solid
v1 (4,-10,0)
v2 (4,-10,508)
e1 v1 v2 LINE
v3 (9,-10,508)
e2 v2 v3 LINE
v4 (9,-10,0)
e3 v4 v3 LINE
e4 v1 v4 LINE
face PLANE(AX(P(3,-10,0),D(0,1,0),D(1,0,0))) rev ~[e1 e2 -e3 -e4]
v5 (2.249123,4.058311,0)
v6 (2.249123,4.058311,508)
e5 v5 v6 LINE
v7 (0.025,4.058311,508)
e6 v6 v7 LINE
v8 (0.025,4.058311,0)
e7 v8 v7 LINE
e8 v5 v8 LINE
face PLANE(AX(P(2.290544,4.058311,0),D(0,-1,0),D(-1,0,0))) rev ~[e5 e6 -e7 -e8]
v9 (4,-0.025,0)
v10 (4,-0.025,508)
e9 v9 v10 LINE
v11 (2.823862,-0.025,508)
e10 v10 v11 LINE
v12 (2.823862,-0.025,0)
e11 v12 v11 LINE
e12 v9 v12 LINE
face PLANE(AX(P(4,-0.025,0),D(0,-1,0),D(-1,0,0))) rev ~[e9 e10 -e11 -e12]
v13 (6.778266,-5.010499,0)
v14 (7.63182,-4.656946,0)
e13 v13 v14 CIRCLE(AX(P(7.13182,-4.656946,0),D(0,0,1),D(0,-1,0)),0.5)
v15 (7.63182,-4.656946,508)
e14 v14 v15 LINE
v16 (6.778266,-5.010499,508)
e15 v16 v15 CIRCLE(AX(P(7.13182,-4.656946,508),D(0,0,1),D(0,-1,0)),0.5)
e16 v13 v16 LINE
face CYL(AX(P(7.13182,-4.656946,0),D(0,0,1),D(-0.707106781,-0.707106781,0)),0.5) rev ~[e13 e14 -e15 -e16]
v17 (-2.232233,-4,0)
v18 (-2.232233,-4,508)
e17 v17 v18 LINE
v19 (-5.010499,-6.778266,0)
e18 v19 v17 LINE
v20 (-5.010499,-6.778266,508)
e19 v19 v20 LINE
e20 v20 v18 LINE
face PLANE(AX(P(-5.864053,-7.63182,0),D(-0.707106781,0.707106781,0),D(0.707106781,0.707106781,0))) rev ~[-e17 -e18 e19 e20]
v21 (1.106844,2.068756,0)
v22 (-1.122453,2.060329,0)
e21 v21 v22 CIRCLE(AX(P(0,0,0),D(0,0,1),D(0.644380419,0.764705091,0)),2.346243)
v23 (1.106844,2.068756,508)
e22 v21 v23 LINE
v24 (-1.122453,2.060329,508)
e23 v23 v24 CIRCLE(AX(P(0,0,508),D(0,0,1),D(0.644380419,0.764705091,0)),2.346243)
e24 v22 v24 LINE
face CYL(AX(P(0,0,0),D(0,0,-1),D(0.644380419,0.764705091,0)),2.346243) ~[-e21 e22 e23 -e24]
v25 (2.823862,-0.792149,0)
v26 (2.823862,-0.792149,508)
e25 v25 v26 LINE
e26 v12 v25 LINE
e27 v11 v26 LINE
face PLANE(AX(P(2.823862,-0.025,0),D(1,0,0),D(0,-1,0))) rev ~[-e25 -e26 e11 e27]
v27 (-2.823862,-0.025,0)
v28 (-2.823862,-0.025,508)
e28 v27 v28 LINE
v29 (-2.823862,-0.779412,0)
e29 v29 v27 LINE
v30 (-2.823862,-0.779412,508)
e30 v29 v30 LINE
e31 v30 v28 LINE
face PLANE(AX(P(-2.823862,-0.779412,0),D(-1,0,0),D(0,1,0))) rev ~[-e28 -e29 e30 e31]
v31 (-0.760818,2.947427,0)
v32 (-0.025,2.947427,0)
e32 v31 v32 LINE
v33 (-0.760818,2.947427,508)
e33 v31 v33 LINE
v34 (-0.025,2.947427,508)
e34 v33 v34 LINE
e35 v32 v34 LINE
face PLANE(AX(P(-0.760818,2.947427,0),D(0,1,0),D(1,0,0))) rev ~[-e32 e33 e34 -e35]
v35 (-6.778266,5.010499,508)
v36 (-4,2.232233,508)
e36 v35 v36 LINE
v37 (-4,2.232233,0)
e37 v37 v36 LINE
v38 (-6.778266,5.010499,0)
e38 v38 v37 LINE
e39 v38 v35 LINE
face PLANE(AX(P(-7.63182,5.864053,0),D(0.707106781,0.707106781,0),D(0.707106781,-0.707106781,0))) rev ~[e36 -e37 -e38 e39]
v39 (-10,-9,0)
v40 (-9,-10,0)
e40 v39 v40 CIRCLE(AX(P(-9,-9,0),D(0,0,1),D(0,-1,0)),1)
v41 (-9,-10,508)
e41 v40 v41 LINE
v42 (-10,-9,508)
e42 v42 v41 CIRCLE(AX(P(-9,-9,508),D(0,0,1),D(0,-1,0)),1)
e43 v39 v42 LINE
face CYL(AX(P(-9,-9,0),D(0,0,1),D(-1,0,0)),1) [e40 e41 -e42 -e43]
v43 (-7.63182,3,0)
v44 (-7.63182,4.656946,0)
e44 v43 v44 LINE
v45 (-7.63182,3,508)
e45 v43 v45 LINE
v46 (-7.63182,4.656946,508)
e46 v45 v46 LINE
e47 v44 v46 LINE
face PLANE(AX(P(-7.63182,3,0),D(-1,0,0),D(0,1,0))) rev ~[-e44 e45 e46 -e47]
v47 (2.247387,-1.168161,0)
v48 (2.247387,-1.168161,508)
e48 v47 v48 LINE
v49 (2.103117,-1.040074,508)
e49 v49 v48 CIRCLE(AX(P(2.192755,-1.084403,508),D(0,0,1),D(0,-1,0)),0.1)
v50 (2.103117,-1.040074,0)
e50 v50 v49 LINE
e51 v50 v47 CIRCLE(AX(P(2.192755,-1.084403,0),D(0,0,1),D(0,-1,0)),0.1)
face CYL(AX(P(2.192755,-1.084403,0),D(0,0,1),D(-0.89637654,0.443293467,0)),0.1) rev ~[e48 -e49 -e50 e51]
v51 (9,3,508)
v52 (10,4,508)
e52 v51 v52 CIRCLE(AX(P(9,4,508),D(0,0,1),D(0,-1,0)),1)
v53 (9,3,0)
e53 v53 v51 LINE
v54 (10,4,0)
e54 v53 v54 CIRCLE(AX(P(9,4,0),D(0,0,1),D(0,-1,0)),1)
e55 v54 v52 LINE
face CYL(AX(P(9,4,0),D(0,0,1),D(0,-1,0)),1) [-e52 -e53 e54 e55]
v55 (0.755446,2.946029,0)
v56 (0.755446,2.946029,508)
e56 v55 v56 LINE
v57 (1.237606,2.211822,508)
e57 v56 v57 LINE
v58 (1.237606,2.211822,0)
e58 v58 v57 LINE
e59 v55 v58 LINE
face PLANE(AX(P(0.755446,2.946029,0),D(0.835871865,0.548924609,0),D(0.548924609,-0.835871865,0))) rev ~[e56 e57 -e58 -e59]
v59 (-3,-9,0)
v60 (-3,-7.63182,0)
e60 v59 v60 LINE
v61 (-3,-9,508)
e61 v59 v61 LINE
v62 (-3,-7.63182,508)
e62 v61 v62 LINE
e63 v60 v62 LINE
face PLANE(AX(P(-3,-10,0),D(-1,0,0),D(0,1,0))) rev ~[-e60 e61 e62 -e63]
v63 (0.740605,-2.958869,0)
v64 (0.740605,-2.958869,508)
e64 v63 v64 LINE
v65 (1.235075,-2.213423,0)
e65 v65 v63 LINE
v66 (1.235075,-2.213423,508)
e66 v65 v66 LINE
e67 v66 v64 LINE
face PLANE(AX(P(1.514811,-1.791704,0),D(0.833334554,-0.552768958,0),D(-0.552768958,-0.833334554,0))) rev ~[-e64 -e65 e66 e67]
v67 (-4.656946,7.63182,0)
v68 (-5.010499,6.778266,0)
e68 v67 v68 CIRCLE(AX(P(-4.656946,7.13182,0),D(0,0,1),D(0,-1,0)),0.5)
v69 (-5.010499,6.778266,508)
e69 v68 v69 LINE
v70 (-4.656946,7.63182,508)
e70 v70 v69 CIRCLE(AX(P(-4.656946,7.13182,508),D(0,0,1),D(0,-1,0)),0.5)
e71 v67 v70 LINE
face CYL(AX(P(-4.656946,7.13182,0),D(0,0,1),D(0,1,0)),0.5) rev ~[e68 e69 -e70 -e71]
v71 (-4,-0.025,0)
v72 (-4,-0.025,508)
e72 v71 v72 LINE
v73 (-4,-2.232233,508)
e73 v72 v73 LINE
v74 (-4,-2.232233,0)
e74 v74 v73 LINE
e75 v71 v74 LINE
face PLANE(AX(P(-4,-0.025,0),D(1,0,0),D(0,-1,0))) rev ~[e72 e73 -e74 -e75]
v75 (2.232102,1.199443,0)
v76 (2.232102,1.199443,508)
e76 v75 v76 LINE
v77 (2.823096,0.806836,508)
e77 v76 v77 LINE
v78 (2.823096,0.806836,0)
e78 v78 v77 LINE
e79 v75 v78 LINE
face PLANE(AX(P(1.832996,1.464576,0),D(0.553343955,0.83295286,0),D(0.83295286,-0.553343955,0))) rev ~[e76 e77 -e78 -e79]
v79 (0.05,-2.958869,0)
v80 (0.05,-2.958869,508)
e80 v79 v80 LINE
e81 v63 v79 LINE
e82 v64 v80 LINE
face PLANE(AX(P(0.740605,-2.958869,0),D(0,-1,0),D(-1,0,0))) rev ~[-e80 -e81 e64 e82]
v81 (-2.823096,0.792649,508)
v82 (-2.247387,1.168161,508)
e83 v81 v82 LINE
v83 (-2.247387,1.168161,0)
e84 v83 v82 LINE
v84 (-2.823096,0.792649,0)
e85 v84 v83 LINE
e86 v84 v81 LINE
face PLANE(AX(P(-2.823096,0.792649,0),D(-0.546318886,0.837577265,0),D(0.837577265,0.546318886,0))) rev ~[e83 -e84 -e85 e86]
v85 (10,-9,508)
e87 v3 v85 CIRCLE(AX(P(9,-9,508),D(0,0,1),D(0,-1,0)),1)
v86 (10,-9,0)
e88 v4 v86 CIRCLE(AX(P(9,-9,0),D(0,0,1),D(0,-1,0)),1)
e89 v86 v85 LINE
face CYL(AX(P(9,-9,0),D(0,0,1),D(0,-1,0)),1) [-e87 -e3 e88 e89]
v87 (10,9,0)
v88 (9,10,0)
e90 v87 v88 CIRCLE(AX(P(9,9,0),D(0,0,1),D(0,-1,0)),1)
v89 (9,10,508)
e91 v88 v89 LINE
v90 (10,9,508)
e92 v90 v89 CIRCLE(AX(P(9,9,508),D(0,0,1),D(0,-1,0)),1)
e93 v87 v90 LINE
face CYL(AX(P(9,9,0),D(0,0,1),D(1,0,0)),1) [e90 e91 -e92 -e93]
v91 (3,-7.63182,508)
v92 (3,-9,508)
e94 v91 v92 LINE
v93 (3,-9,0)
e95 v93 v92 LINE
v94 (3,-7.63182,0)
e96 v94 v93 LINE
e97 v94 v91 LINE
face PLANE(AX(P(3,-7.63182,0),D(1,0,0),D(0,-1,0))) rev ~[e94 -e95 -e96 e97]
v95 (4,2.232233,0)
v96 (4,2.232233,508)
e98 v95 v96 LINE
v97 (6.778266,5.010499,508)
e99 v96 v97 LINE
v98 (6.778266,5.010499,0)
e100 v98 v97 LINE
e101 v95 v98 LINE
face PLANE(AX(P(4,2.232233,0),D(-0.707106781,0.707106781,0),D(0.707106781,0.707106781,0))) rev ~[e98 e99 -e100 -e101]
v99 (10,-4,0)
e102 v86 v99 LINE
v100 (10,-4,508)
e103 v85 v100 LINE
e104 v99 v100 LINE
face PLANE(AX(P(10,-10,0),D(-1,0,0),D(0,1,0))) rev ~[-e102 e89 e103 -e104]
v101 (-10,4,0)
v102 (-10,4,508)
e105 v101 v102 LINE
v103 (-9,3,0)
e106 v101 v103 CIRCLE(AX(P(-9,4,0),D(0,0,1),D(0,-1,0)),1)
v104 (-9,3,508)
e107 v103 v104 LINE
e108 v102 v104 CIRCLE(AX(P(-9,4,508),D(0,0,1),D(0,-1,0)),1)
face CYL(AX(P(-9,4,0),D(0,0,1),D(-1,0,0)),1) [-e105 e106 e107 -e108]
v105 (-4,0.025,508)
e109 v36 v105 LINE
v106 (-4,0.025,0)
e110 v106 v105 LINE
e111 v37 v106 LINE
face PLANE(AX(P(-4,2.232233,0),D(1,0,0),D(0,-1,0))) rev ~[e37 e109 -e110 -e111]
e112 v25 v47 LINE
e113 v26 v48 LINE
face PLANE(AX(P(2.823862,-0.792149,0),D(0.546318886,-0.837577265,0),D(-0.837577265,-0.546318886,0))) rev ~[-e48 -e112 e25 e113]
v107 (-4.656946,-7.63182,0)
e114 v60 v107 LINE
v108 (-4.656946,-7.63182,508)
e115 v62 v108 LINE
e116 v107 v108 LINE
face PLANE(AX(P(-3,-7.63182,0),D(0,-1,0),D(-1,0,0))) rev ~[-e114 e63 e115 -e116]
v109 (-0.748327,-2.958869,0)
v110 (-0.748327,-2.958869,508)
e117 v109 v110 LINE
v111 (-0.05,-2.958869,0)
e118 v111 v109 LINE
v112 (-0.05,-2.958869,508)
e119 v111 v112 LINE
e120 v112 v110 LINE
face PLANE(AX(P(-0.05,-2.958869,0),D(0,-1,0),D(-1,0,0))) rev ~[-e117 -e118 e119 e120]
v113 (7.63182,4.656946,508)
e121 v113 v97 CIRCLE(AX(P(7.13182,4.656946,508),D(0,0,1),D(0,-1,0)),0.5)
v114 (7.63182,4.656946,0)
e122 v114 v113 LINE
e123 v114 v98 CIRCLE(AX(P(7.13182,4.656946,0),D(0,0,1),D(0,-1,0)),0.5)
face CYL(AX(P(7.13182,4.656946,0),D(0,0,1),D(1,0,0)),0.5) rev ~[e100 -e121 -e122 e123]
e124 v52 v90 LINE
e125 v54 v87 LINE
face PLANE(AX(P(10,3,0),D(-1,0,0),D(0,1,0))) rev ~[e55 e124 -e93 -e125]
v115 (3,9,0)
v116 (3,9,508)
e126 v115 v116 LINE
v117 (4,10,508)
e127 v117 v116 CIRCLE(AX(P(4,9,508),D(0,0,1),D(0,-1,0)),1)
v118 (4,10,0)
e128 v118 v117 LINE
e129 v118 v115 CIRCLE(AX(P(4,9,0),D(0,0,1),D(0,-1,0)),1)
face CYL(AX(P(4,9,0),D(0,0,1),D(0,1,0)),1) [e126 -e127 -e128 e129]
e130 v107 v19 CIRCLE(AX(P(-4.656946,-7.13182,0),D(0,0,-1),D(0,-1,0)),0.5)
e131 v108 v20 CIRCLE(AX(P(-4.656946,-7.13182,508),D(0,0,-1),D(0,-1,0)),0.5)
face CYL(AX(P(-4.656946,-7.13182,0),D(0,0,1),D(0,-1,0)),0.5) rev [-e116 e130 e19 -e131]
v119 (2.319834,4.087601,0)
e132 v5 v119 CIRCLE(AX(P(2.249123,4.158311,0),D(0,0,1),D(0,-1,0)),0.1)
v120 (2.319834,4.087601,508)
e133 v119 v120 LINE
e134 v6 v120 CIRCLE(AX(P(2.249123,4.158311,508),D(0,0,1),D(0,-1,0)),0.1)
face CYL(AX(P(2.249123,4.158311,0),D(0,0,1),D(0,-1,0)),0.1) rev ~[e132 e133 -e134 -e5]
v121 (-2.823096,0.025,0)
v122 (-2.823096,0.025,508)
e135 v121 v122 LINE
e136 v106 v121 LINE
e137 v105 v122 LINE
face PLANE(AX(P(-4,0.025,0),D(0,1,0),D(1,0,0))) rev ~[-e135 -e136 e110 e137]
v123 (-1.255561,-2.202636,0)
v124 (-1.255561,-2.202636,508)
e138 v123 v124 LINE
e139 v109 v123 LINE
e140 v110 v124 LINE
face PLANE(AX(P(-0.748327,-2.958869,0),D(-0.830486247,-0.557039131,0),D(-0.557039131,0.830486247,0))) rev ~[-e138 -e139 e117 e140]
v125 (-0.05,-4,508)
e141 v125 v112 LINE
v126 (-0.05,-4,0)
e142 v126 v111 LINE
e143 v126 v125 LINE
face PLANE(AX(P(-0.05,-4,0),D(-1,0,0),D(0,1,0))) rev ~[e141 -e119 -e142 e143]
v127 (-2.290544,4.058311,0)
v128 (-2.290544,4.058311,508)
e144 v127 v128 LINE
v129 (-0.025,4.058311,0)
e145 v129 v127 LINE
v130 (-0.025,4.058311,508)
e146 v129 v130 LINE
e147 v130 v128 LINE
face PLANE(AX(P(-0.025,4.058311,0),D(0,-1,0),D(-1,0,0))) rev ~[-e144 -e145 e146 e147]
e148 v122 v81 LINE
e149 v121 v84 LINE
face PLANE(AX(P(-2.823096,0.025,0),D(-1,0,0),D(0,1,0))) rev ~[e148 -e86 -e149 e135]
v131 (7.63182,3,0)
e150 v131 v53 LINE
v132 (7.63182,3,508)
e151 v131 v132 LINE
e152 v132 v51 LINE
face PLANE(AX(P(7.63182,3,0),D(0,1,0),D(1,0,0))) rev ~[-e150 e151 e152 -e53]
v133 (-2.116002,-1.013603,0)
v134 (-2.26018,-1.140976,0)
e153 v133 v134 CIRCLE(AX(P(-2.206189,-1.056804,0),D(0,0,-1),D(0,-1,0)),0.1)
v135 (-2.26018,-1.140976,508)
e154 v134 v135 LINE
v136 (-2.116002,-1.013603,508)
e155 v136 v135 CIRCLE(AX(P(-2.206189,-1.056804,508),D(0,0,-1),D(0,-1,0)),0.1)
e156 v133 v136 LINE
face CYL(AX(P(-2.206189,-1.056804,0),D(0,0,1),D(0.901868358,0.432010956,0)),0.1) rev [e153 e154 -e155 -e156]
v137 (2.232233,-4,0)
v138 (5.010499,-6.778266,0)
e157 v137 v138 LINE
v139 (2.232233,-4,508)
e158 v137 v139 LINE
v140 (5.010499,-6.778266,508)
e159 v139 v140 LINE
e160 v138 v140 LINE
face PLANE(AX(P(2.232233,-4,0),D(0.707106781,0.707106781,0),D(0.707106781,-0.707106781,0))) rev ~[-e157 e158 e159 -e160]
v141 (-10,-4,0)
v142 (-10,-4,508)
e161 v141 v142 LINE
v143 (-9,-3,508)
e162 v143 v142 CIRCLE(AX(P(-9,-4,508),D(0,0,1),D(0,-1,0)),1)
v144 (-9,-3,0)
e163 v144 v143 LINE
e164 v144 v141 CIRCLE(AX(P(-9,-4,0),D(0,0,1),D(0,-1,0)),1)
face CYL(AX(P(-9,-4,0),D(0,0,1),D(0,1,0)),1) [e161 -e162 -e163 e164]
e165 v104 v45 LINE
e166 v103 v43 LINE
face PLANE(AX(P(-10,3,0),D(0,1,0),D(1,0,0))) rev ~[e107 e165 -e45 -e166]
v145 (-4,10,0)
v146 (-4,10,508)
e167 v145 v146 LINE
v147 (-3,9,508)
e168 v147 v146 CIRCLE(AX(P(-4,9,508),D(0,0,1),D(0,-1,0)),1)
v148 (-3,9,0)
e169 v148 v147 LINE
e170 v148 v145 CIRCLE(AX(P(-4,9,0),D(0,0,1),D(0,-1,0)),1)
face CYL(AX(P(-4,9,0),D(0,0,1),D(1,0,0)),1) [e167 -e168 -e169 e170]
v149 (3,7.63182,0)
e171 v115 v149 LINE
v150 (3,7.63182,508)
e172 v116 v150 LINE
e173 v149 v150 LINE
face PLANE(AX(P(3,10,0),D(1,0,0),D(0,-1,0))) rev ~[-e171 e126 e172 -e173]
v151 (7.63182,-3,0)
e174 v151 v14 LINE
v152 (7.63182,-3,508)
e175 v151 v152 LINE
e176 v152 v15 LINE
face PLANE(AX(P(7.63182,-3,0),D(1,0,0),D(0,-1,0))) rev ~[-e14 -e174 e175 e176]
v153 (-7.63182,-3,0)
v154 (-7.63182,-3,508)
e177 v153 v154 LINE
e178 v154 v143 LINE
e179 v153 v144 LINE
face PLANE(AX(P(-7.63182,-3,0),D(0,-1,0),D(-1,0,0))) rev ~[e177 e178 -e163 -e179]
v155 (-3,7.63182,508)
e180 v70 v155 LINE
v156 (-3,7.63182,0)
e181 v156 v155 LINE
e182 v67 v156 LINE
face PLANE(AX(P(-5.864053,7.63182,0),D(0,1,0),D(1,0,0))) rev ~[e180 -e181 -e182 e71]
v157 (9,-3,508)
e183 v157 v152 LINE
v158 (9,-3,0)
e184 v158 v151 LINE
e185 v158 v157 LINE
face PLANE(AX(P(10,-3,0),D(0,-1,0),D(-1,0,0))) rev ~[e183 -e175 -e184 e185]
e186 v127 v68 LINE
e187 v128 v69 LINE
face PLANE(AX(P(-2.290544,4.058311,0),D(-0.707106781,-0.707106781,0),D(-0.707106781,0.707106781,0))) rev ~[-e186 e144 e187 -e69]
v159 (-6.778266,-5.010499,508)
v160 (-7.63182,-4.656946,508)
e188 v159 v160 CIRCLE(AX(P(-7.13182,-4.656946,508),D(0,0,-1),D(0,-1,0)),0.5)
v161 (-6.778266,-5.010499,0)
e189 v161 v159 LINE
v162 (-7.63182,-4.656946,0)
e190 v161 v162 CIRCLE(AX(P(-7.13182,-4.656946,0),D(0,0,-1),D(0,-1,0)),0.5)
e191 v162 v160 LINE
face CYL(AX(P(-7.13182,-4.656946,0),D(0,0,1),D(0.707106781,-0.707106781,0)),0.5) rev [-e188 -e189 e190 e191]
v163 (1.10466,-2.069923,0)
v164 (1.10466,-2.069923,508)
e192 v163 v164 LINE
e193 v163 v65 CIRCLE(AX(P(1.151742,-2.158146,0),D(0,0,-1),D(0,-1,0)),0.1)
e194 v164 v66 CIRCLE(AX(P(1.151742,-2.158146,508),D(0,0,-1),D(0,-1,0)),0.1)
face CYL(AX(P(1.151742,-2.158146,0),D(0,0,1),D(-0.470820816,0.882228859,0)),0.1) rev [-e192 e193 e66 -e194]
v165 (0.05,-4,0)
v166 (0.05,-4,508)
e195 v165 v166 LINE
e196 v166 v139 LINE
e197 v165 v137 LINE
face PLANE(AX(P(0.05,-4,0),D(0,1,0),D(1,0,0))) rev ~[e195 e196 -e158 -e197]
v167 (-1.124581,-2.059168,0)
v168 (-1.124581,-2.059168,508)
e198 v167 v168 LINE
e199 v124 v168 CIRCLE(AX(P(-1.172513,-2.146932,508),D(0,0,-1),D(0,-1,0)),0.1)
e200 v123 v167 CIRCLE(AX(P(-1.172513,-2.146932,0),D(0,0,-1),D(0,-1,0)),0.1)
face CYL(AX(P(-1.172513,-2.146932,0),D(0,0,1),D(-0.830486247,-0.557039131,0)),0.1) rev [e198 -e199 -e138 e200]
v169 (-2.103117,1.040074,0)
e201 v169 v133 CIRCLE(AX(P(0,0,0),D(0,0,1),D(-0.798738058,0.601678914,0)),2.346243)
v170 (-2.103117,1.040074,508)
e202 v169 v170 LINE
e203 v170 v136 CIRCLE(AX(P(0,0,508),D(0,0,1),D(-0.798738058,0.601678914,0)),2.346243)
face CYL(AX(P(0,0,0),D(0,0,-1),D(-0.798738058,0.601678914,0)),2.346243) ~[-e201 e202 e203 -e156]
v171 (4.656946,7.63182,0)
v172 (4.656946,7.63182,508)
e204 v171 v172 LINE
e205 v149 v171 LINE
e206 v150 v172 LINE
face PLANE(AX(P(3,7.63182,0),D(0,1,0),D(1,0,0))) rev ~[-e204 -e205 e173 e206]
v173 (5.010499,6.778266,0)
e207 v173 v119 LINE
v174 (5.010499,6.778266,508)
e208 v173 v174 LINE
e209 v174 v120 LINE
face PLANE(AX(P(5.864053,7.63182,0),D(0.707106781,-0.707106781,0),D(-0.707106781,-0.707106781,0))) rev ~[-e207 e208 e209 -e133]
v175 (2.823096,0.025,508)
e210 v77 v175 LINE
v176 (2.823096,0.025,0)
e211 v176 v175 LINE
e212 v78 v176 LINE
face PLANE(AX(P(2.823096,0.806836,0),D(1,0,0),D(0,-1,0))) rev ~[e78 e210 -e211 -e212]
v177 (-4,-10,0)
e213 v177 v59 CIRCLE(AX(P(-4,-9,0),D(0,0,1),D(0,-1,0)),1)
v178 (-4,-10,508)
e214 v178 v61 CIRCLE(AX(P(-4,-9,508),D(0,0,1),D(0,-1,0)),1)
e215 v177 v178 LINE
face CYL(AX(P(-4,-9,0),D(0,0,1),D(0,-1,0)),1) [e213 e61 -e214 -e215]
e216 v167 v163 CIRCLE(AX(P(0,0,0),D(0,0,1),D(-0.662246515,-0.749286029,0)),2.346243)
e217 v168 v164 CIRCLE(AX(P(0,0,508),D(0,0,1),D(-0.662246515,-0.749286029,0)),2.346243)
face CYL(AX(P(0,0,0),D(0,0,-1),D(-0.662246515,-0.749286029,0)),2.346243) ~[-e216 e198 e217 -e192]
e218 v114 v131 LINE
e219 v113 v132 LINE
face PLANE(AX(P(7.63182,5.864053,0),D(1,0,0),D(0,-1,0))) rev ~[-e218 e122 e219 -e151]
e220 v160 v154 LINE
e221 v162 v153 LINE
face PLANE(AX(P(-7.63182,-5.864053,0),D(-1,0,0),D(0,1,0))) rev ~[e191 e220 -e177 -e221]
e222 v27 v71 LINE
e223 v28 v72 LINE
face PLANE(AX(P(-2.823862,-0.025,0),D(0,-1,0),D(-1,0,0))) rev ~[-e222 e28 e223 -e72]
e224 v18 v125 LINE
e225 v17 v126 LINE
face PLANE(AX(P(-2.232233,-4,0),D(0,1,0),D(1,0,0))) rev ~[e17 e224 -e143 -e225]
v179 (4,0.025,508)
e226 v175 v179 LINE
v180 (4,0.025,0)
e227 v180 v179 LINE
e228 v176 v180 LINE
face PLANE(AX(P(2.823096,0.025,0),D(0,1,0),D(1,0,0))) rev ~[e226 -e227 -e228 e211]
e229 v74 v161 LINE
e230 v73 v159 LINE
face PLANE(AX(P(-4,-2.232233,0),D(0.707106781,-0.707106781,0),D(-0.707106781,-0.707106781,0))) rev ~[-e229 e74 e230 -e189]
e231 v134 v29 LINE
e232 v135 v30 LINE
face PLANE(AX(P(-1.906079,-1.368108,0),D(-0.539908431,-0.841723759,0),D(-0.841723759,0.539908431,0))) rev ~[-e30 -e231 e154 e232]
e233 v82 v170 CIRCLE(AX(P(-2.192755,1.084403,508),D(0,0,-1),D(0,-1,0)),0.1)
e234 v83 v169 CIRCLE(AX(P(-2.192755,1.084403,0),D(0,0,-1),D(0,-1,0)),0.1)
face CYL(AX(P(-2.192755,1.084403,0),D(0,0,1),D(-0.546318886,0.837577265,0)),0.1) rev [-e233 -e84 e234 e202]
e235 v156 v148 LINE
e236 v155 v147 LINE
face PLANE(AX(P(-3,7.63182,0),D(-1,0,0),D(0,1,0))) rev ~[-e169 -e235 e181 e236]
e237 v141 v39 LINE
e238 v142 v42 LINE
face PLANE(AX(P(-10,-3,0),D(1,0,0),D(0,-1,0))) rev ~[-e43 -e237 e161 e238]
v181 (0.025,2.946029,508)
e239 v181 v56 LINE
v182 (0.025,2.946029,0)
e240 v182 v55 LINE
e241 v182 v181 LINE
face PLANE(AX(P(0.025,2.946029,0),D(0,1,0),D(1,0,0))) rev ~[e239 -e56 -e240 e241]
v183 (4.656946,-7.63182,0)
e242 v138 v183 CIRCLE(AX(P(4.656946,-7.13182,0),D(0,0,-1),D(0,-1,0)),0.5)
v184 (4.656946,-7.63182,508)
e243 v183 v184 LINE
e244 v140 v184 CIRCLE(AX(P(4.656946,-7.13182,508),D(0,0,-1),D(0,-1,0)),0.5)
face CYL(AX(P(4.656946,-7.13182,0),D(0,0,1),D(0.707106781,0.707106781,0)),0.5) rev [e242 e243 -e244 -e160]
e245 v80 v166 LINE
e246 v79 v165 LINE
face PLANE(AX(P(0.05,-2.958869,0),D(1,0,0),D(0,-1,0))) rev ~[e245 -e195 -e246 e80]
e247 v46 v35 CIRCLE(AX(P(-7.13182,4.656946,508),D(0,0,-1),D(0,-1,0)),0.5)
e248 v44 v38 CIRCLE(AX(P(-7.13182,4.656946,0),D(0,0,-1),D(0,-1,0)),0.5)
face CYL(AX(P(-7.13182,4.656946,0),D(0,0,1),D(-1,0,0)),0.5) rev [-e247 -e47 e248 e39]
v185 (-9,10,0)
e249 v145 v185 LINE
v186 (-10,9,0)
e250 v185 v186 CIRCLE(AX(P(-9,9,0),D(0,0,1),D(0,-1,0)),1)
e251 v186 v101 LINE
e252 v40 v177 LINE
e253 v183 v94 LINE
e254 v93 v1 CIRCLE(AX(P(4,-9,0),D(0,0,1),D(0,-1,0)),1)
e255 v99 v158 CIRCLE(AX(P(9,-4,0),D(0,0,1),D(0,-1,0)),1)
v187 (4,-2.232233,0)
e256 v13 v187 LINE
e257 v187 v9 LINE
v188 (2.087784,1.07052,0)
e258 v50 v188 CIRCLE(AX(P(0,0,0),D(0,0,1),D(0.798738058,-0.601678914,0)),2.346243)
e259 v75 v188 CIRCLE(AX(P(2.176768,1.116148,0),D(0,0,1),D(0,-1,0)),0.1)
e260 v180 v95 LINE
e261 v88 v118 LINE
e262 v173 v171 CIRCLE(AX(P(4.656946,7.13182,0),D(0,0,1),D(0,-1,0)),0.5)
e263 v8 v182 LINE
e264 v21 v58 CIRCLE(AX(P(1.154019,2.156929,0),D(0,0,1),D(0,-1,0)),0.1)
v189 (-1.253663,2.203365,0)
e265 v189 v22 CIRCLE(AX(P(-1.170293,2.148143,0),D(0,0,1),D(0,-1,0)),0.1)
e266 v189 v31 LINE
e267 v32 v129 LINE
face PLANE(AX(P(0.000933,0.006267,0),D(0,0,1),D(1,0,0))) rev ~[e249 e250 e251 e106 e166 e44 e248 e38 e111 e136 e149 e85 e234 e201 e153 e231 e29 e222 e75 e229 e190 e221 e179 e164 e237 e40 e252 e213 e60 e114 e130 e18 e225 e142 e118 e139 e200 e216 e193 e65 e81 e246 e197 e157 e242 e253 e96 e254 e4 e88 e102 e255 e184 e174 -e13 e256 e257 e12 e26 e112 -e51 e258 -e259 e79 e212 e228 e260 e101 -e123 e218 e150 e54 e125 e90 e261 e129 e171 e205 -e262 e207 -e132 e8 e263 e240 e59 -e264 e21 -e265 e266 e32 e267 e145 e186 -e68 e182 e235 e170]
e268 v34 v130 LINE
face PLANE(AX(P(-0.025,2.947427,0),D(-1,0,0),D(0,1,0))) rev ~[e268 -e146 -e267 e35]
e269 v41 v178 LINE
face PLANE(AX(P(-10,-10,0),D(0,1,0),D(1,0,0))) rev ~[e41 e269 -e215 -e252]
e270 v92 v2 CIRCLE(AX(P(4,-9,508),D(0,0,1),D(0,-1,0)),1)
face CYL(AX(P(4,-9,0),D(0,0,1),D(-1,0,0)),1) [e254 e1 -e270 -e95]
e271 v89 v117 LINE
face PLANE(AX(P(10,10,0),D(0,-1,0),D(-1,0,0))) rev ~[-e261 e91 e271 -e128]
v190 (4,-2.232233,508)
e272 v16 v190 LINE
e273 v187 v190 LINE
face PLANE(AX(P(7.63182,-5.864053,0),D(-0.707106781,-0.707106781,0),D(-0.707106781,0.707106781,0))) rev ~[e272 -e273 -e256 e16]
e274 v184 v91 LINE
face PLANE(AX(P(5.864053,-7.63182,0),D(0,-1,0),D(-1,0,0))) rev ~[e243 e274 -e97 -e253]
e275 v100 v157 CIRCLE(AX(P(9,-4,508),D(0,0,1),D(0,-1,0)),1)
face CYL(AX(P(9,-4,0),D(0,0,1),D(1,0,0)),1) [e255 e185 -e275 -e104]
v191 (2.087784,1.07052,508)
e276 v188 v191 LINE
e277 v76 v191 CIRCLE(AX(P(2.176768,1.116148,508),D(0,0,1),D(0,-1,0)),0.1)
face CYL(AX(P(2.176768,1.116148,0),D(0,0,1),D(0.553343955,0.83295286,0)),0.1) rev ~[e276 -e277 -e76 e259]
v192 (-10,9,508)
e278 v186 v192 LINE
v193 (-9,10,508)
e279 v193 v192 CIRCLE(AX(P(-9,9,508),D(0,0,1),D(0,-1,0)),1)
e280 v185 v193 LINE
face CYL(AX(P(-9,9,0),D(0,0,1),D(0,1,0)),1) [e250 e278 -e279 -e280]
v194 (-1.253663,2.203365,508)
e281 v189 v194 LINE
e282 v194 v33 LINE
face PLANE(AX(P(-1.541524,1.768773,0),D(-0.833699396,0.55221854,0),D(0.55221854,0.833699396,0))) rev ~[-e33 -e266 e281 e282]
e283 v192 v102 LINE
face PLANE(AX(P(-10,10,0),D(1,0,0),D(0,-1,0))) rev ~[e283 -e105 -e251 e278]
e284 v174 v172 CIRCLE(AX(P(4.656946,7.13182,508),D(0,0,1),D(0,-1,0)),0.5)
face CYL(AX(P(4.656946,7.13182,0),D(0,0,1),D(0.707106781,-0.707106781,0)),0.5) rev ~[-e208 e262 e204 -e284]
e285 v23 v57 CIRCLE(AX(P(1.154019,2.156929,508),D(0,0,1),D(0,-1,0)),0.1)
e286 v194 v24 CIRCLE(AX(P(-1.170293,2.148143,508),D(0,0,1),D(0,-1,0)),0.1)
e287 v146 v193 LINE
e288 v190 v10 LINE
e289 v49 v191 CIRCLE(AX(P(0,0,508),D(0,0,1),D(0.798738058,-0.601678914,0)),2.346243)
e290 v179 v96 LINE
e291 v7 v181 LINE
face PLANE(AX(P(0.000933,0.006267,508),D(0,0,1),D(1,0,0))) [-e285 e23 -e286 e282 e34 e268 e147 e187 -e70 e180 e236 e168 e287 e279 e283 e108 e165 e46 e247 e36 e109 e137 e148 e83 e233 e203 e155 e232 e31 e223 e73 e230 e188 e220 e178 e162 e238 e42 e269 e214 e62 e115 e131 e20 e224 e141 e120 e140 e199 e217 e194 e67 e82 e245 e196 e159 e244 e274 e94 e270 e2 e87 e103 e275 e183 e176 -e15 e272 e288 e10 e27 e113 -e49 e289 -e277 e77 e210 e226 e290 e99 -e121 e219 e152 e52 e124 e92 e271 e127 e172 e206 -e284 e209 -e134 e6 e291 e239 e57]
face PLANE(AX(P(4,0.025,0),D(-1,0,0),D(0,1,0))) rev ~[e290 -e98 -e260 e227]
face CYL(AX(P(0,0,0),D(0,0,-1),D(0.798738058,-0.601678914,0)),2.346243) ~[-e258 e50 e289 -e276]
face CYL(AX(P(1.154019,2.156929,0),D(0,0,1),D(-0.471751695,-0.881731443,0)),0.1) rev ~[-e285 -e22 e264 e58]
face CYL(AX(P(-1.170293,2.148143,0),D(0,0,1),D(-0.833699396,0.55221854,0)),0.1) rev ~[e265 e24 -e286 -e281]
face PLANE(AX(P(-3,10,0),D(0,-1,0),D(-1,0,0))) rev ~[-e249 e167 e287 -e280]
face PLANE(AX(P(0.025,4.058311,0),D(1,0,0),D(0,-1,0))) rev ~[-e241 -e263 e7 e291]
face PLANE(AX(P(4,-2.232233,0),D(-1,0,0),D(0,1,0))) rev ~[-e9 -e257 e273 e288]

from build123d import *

# Parameters (mm, degrees)
F1_DEPTH = 508
F2_R     = 1
F3_R     = 0.5
F4_R     = 0.1


with BuildPart() as f1:
    # F0 (on Top) → F1 (new body)
    with BuildSketch(Plane.XY):
        with BuildLine():
            Line((-0.025, 4.0583112277), (-2.2905442747, 4.0583112277))
            Line((-2.2905442747, 4.0583112277), (-5.8640526549, 7.6318196079))
            Line((-5.8640526549, 7.6318196079), (-3, 7.6318196079))
            Line((-3, 7.6318196079), (-3, 10))
            Line((-3, 10), (-10, 10))
            Line((-10, 10), (-10, 3))
            Line((-10, 3), (-7.6318196079, 3))
            Line((-7.6318196079, 3), (-7.6318196079, 5.8640526549))
            Line((-7.6318196079, 5.8640526549), (-4, 2.232233047))
            Line((-4, 2.232233047), (-4, 0.025))
            Line((-4, 0.025), (-2.8230957687, 0.025))
            Line((-2.8230957687, 0.025), (-2.8230957687, 0.7926485917))
            Line((-2.8230957687, 0.7926485917), (-1.8740334308, 1.411684829))
            ThreePointArc((-1.8740334308, 1.411684829), (-2.3460869309, 0.0270456781), (-1.906078865, -1.3681077138))
            Line((-1.906078865, -1.3681077138), (-2.8238623803, -0.7794121329))
            Line((-2.8238623803, -0.7794121329), (-2.8238623803, -0.025))
            Line((-2.8238623803, -0.025), (-4, -0.025))
            Line((-4, -0.025), (-4, -2.232233047))
            Line((-4, -2.232233047), (-7.6318196079, -5.8640526549))
            Line((-7.6318196079, -5.8640526549), (-7.6318196079, -3))
            Line((-7.6318196079, -3), (-10, -3))
            Line((-10, -3), (-10, -10))
            Line((-10, -10), (-3, -10))
            Line((-3, -10), (-3, -7.6318196079))
            Line((-3, -7.6318196079), (-5.8640526549, -7.6318196079))
            Line((-5.8640526549, -7.6318196079), (-2.232233047, -4))
            Line((-2.232233047, -4), (-0.05, -4))
            Line((-0.05, -4), (-0.05, -2.9588690959))
            Line((-0.05, -2.9588690959), (-0.7483266194, -2.9588690959))
            Line((-0.7483266194, -2.9588690959), (-1.5537911294, -1.7580069631))
            ThreePointArc((-1.5537911294, -1.7580069631), (-0.0257632285, -2.3461013645), (1.5148107083, -1.7917041816))
            Line((1.5148107083, -1.7917041816), (0.7406048023, -2.9588690959))
            Line((0.7406048023, -2.9588690959), (0.05, -2.9588690959))
            Line((0.05, -2.9588690959), (0.05, -4))
            Line((0.05, -4), (2.232233047, -4))
            Line((2.232233047, -4), (5.8640526549, -7.6318196079))
            Line((5.8640526549, -7.6318196079), (3, -7.6318196079))
            Line((3, -7.6318196079), (3, -10))
            Line((3, -10), (10, -10))
            Line((10, -10), (10, -3))
            Line((10, -3), (7.6318196079, -3))
            Line((7.6318196079, -3), (7.6318196079, -5.8640526549))
            Line((7.6318196079, -5.8640526549), (4, -2.232233047))
            Line((4, -2.232233047), (4, -0.025))
            Line((4, -0.025), (2.8238623803, -0.025))
            Line((2.8238623803, -0.025), (2.8238623803, -0.7921485609))
            Line((2.8238623803, -0.7921485609), (1.8740334308, -1.411684829))
            ThreePointArc((1.8740334308, -1.411684829), (2.3460040432, 0.0334721598), (1.8329957125, 1.4645757318))
            Line((1.8329957125, 1.4645757318), (2.8230957687, 0.8068363719))
            Line((2.8230957687, 0.8068363719), (2.8230957687, 0.025))
            Line((2.8230957687, 0.025), (4, 0.025))
            Line((4, 0.025), (4, 2.232233047))
            Line((4, 2.232233047), (7.6318196079, 5.8640526549))
            Line((7.6318196079, 5.8640526549), (7.6318196079, 3))
            Line((7.6318196079, 3), (10, 3))
            Line((10, 3), (10, 10))
            Line((10, 10), (3, 10))
            Line((3, 10), (3, 7.6318196079))
            Line((3, 7.6318196079), (5.8640526549, 7.6318196079))
            Line((5.8640526549, 7.6318196079), (2.2905442747, 4.0583112277))
            Line((2.2905442747, 4.0583112277), (0.025, 4.0583112277))
            Line((0.025, 4.0583112277), (0.025, 2.9460287187))
            Line((0.025, 2.9460287187), (0.7554459771, 2.9460287187))
            Line((0.7554459771, 2.9460287187), (1.5118729288, 1.7941838266))
            ThreePointArc((1.5118729288, 1.7941838266), (-0.0195250931, 2.3461615731), (-1.5415243666, 1.7687730164))
            Line((-1.5415243666, 1.7687730164), (-0.7608180556, 2.9474266339))
            Line((-0.7608180556, 2.9474266339), (-0.025, 2.9474266339))
            Line((-0.025, 2.9474266339), (-0.025, 4.0583112277))
        make_face()
    extrude(amount=F1_DEPTH)

    # F2
    f2_edges = [f1.edges().sort_by_distance(p)[0] for p in [
        (10, 10, 254),
        (10, -10, 254),
        (-10, -10, 254),
        (-3, -10, 254),
        (3, -10, 254),
        (-3, 10, 254),
        (-10, 3, 254),
        (10, 3, 254),
        (10, -3, 254),
        (-10, -3, 254),
        (-10, 10, 254),
        (3, 10, 254),
    ]]
    fillet(f2_edges, radius=F2_R)

    # F3
    f3_edges = [f1.edges().sort_by_distance(p)[0] for p in [
        (-7.63182, 5.864053, 254),
        (-5.864053, 7.63182, 254),
        (5.864053, 7.63182, 254),
        (7.63182, 5.864053, 254),
        (-7.63182, -5.864053, 254),
        (-5.864053, -7.63182, 254),
        (5.864053, -7.63182, 254),
        (7.63182, -5.864053, 254),
    ]]
    fillet(f3_edges, radius=F3_R)

    # F4
    f4_edges = [f1.edges().sort_by_distance(p)[0] for p in [
        (-1.874033, 1.411685, 254),
        (2.290544, 4.058311, 254),
        (4.656946, 7.63182, 254),
        (-1.541524, 1.768773, 254),
        (1.514811, -1.791704, 254),
        (1.874033, -1.411685, 254),
        (1.832996, 1.464576, 254),
        (1.511873, 1.794184, 254),
        (-1.906079, -1.368108, 254),
        (-1.553791, -1.758007, 254),
    ]]
    fillet(f4_edges, radius=F4_R)


solid = f1.part
